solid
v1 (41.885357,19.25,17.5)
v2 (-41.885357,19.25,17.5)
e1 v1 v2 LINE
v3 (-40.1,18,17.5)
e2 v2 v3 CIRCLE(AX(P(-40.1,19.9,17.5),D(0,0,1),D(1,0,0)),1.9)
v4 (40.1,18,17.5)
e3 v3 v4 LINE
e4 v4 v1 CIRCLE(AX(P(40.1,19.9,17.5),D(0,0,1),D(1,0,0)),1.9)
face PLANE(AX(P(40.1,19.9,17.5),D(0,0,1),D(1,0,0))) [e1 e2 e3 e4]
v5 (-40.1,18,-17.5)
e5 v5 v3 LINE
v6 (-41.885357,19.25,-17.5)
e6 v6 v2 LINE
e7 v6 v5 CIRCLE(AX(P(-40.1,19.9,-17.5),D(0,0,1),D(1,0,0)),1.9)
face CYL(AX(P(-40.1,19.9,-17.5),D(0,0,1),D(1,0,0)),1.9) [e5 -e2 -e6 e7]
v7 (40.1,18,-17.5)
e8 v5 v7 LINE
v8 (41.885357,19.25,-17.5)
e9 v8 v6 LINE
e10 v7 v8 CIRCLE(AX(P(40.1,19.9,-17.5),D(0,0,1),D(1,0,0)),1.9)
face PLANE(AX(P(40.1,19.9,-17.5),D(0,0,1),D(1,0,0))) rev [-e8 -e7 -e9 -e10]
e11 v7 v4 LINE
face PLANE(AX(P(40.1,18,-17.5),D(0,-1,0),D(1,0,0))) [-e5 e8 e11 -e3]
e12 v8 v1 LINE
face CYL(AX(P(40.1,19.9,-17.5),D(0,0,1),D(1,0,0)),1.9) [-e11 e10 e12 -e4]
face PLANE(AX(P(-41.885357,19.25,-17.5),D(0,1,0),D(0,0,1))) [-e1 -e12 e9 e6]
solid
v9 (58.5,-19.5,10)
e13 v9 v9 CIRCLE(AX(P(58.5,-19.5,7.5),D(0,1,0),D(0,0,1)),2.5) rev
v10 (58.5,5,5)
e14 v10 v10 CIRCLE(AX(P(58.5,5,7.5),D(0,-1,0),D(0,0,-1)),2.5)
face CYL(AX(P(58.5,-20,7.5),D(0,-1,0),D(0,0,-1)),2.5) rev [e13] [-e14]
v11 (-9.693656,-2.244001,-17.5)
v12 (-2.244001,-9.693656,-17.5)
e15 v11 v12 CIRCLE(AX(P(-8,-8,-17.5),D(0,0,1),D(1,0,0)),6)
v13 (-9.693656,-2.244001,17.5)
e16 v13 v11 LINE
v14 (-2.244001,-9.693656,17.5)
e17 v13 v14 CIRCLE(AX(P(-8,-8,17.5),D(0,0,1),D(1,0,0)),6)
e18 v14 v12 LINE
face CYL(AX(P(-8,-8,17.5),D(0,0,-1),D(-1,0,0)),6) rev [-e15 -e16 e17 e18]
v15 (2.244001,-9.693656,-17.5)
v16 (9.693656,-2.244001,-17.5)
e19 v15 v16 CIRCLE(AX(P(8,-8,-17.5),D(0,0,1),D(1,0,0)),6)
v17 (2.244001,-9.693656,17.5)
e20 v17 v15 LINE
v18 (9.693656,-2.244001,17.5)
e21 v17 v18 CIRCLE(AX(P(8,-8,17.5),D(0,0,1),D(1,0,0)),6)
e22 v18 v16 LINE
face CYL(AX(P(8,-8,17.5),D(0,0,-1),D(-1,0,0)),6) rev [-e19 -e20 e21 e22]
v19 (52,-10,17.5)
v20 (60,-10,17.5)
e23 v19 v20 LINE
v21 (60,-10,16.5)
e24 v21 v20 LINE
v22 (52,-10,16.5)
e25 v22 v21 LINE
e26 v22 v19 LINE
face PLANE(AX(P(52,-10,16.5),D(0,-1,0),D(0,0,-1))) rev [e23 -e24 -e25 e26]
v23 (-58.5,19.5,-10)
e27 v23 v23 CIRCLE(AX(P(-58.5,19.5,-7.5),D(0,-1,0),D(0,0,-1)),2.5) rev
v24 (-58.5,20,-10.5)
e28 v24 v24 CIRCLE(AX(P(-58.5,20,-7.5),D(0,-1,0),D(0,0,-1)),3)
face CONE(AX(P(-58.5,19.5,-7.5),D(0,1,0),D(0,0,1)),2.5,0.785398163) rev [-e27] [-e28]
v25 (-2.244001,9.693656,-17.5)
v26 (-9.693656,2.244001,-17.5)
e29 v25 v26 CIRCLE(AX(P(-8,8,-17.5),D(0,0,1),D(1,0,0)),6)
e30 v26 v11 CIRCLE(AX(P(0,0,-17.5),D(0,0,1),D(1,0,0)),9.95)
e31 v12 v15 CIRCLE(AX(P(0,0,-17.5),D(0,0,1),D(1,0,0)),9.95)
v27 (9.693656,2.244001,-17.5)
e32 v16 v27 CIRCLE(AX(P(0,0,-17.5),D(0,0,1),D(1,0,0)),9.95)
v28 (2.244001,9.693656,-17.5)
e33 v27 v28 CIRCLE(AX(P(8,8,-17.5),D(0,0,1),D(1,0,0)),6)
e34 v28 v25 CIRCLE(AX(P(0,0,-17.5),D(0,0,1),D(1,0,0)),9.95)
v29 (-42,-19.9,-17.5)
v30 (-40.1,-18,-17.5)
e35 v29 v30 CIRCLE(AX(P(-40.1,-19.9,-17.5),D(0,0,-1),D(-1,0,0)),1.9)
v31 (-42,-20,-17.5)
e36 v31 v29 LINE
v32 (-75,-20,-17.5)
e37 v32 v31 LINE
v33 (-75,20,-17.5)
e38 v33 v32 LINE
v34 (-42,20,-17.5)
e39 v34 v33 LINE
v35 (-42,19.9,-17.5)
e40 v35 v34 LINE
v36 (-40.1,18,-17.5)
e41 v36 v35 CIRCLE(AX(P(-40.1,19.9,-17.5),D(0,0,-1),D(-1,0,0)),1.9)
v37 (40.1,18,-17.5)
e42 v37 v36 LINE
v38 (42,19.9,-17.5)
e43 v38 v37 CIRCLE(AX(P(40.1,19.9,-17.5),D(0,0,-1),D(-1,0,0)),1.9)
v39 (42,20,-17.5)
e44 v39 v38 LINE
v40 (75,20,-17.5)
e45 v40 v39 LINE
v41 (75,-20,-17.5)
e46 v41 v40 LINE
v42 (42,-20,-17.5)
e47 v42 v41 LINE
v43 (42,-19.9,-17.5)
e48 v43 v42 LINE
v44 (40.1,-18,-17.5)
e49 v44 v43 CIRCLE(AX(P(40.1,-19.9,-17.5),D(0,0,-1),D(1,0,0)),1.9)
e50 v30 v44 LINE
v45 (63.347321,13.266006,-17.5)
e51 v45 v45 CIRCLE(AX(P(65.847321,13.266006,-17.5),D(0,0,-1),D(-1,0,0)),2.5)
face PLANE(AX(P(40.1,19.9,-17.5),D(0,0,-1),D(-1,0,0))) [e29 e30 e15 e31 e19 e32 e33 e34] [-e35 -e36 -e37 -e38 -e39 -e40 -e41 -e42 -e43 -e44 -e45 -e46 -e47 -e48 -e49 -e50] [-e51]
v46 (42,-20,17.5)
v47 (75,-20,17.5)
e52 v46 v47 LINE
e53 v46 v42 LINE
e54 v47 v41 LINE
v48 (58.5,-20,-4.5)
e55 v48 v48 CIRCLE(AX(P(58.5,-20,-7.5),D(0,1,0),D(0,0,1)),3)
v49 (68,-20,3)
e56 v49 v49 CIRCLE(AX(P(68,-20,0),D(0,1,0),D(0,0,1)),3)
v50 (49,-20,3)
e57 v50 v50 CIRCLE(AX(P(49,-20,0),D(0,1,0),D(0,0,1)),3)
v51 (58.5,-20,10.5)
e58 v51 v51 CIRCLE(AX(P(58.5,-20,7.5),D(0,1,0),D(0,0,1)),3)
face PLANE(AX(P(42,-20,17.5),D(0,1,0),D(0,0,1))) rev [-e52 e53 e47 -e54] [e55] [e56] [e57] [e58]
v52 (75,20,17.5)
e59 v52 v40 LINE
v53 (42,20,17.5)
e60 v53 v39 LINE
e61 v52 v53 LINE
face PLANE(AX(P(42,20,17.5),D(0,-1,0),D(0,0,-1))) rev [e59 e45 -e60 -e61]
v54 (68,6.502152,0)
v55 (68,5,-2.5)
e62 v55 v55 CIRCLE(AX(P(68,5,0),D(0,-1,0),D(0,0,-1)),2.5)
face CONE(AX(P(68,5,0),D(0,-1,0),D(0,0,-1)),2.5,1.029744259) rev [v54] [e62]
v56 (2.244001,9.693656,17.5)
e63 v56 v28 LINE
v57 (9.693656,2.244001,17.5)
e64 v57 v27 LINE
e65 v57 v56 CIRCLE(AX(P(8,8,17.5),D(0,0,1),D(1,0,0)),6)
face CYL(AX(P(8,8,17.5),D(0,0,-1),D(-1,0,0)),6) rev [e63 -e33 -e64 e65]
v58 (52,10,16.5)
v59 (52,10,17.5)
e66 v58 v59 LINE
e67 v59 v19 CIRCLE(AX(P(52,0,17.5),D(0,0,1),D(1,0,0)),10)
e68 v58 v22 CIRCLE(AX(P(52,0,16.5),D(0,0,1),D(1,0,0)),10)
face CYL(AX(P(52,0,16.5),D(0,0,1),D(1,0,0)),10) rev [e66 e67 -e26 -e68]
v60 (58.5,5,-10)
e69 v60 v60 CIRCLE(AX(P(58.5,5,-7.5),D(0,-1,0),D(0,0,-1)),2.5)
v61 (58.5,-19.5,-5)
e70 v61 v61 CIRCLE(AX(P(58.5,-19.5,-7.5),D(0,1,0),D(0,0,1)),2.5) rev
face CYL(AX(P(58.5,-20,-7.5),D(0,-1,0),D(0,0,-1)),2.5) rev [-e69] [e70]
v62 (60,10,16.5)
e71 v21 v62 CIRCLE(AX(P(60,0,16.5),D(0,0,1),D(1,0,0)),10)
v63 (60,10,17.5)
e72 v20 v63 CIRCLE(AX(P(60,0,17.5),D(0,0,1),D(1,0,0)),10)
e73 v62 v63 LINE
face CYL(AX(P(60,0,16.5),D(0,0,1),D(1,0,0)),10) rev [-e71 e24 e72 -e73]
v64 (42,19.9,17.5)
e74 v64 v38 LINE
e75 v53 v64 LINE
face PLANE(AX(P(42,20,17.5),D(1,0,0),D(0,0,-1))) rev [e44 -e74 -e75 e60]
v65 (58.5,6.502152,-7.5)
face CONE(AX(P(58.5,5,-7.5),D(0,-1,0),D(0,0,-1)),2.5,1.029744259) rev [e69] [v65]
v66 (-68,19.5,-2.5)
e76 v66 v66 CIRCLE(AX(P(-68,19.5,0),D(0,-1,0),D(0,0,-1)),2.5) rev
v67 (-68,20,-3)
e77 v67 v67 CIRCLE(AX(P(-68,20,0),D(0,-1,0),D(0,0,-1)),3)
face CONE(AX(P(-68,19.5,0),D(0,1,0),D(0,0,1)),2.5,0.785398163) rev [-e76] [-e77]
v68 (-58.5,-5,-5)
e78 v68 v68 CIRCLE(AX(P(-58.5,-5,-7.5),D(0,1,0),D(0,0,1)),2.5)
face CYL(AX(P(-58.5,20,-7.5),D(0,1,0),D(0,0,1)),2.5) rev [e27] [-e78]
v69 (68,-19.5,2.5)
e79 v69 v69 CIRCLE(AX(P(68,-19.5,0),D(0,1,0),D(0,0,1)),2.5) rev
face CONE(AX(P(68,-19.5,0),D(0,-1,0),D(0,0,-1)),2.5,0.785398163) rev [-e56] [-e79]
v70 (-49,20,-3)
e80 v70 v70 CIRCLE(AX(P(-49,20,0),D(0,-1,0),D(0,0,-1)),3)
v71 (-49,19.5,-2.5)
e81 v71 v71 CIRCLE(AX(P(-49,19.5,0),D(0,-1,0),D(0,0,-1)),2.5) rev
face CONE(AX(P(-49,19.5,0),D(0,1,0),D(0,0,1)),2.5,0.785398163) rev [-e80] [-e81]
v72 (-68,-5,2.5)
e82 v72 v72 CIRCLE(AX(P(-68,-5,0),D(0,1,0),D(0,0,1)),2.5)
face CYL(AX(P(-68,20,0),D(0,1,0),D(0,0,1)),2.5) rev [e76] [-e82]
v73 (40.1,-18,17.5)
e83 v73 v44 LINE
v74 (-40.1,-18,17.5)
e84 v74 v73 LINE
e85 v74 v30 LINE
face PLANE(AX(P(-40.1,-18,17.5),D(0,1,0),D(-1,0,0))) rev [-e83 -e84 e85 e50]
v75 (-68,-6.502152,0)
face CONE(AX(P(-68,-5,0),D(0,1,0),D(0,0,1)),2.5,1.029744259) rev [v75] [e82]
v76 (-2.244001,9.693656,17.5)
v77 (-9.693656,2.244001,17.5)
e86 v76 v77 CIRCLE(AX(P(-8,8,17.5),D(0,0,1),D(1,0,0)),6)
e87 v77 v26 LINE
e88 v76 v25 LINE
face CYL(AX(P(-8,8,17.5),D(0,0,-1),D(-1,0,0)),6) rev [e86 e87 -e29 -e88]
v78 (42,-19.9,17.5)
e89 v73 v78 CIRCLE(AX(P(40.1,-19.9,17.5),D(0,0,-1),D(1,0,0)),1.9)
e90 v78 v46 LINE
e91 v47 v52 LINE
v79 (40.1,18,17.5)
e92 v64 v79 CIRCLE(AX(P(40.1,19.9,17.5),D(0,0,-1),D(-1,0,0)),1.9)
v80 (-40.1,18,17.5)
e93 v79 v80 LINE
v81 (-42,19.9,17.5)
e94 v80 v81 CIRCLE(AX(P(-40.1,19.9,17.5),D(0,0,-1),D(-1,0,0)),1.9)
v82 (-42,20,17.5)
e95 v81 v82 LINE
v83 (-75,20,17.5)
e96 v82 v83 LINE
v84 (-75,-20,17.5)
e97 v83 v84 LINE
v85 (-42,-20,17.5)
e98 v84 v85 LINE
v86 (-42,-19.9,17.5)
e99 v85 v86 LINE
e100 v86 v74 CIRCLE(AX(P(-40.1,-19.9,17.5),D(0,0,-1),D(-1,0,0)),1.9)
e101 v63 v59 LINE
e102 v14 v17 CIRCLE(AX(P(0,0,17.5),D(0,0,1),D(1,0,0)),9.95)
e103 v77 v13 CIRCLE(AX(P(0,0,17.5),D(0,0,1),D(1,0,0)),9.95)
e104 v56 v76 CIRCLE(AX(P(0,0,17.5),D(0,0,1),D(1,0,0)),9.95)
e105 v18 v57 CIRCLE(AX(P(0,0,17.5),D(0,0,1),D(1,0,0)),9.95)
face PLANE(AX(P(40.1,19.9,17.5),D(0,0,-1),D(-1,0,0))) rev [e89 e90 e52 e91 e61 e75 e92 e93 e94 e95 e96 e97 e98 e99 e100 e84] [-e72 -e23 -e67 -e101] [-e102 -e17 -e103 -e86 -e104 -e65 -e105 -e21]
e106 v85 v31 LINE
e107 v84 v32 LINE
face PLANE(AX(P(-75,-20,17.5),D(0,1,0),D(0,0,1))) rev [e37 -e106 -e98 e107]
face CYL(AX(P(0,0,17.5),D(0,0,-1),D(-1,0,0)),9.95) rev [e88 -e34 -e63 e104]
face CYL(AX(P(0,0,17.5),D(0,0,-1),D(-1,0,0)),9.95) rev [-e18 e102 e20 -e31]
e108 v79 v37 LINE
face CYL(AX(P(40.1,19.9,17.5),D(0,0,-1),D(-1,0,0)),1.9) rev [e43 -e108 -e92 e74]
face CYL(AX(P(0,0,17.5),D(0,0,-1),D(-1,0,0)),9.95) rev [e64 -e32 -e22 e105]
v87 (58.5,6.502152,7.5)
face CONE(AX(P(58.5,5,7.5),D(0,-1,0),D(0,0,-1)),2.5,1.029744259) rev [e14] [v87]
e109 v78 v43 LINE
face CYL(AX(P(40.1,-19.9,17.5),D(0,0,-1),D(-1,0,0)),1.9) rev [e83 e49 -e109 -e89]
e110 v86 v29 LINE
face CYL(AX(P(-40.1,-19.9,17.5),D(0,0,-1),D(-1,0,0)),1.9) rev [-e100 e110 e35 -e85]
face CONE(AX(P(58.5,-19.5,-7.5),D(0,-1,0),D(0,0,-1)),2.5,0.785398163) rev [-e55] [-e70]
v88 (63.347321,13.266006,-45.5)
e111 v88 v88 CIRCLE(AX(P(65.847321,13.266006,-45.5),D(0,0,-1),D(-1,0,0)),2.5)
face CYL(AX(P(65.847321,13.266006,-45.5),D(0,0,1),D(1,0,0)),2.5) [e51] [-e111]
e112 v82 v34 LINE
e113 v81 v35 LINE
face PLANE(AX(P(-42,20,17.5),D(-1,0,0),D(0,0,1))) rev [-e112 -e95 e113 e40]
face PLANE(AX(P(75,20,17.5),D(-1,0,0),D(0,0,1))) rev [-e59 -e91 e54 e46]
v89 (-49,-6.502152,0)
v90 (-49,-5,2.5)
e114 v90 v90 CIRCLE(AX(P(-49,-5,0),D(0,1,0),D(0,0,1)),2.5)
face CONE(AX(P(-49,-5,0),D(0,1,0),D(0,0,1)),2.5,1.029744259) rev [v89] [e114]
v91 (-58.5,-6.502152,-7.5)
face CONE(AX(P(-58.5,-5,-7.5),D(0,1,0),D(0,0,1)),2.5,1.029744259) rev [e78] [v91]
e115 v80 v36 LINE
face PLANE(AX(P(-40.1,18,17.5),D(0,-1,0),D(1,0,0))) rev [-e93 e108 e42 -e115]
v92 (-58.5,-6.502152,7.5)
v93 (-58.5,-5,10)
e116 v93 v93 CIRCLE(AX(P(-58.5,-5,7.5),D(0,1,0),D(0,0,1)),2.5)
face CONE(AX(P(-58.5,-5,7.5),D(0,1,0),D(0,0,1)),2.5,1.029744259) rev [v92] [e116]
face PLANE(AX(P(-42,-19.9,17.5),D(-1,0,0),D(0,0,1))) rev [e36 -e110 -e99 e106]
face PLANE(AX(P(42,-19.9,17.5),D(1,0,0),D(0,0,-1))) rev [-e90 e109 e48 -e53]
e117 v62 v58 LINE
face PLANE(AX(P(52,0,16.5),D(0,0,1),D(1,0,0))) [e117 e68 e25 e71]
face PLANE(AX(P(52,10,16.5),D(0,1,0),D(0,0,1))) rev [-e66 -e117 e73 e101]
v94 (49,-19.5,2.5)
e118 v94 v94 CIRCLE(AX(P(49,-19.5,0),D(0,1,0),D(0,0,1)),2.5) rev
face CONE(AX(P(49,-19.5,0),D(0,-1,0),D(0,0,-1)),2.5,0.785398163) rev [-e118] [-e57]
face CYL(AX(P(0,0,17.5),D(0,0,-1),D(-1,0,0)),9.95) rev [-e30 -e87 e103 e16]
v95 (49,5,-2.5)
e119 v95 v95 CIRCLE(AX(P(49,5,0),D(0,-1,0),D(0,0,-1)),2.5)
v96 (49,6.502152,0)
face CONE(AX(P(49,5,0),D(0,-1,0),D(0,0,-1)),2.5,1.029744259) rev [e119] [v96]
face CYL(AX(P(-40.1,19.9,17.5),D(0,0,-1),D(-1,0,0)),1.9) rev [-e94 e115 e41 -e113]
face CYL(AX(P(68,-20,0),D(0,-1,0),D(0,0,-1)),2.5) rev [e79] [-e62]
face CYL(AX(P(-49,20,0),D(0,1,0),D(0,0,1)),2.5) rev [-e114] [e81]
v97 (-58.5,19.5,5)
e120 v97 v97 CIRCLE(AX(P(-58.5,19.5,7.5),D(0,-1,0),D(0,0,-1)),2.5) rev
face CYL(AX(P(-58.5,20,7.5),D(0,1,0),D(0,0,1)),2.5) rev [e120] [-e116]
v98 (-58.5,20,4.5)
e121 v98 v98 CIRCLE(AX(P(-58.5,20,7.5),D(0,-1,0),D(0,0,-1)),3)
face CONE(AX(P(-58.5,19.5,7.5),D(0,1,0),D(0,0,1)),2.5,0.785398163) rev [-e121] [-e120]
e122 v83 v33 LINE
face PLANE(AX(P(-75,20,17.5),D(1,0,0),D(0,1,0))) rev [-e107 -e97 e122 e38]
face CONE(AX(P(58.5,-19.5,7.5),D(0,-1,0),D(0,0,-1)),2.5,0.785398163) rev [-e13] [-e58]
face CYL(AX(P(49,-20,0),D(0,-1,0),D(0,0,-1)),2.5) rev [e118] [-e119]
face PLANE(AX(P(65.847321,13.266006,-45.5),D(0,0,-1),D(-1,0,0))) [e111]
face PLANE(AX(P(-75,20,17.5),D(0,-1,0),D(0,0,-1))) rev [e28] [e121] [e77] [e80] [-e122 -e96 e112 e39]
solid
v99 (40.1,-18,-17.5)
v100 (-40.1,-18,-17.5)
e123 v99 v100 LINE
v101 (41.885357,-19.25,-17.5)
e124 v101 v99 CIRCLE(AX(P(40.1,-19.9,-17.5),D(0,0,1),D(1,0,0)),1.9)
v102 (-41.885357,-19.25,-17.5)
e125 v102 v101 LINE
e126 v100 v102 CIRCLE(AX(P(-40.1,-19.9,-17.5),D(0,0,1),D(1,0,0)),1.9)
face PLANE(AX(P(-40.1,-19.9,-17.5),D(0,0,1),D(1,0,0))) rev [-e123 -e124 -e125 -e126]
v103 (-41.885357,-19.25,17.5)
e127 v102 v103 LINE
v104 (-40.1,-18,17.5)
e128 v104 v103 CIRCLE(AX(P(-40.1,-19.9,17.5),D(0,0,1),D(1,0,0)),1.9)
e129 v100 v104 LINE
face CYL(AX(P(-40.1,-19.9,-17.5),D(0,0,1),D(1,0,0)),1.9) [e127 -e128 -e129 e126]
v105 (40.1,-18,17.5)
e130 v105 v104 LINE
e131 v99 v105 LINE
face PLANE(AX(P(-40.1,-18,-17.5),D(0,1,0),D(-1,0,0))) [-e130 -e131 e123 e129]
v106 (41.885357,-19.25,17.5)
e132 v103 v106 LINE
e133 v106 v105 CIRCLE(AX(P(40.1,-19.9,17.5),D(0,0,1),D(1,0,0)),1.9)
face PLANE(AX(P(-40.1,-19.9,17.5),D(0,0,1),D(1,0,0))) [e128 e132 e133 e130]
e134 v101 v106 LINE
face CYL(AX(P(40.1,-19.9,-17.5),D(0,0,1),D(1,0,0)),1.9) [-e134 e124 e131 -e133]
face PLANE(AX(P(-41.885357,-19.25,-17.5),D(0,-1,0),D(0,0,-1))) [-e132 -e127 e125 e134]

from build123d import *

# Parameters (mm, degrees)
EXTRUDE_1_DEPTH     = 17.5
EXTRUDE_2_DEPTH     = 35
EXTRUDE_2_2_DEPTH   = 35
CUT_EXTRUDE_1_DEPTH = 1
CHAMFER_2_SIZE      = 0.5
SKETCH1_R           = 2.5
BOSS_EXTRUDE1_DEPTH = 28


# Read off the part's stored shape, not the designer's step: M6 螺纹孔2
with BuildPart() as part:
    # 草图1 → 凸台-拉伸1 (new, symmetric)
    with BuildSketch(Plane.XY):
        with BuildLine():
            Line((-42, 20), (-42, 19.9))
            ThreePointArc((-42, 19.9), (-41.443502884, 18.556497116), (-40.1, 18))
            Line((-40.1, 18), (40.1, 18))
            ThreePointArc((40.1, 18), (41.443502884, 18.556497116), (42, 19.9))
            Line((42, 19.9), (42, 20))
            Line((42, 20), (75, 20))
            Line((75, 20), (75, -20))
            Line((75, -20), (42, -20))
            Line((42, -20), (42, -19.9))
            ThreePointArc((42, -19.9), (41.443502884, -18.556497116), (40.1, -18))
            Line((40.1, -18), (-40.1, -18))
            ThreePointArc((-40.1, -18), (-41.443502884, -18.556497116), (-42, -19.9))
            Line((-42, -19.9), (-42, -20))
            Line((-42, -20), (-75, -20))
            Line((-75, -20), (-75, 20))
            Line((-75, 20), (-42, 20))
        make_face()
        with BuildLine():
            ThreePointArc((2.244000503, 9.693655747), (0, 9.95), (-2.244000503, 9.693655747))
            ThreePointArc((-2.244000503, 9.693655747), (-12.242640687, 12.242640687), (-9.693655747, 2.244000503))
            ThreePointArc((-9.693655747, 2.244000503), (-9.95, 0), (-9.693655747, -2.244000503))
            ThreePointArc((-9.693655747, -2.244000503), (-12.242640687, -12.242640687), (-2.244000503, -9.693655747))
            ThreePointArc((-2.244000503, -9.693655747), (0, -9.95), (2.244000503, -9.693655747))
            ThreePointArc((2.244000503, -9.693655747), (12.242640687, -12.242640687), (9.693655747, -2.244000503))
            ThreePointArc((9.693655747, -2.244000503), (9.95, 0), (9.693655747, 2.244000503))
            ThreePointArc((9.693655747, 2.244000503), (12.242640687, 12.242640687), (2.244000503, 9.693655747))
        make_face(mode=Mode.SUBTRACT)
    extrude(amount=EXTRUDE_1_DEPTH, both=True)

    # 草图3 → 切除-拉伸1 (cut)
    with BuildSketch(Plane.XY.offset(17.5)):
        with BuildLine():
            Line((52, 10), (60, 10))
            ThreePointArc((60, 10), (70, 0), (60, -10))
            Line((60, -10), (52, -10))
            ThreePointArc((52, -10), (42, 0), (52, 10))
        make_face()
    extrude(amount=-CUT_EXTRUDE_1_DEPTH, mode=Mode.SUBTRACT)

    # M6 螺纹孔2 outline → M6 螺纹孔2 (revolve, cut)
    with BuildSketch(Plane(origin=(-58.5, 0, 7.5), x_dir=(1, 0, 0), z_dir=(0, 0, 1))):
        Polygon((0, 20), (0, -6.502151548), (2.5, -5), (2.5, 20), align=None)
    revolve(axis=Axis((-58.5, 0, 7.5), (0, 1, 0)), mode=Mode.SUBTRACT)

    # Hole Wizard M6 _2 2 outline → Hole Wizard M6 _2 2 (revolve, cut)
    with BuildSketch(Plane(origin=(-68, 0, 0), x_dir=(1, 0, 0), z_dir=(0, 0, 1))):
        Polygon((0, 20), (0, -6.502151548), (2.5, -5), (2.5, 20), align=None)
    revolve(axis=Axis((-68, 0, 0), (0, 1, 0)), mode=Mode.SUBTRACT)

    # Hole Wizard M6 _2 3 outline → Hole Wizard M6 _2 3 (revolve, cut)
    with BuildSketch(Plane(origin=(-58.5, 0, -7.5), x_dir=(1, 0, 0), z_dir=(0, 0, 1))):
        Polygon((0, 20), (0, -6.502151548), (2.5, -5), (2.5, 20), align=None)
    revolve(axis=Axis((-58.5, 0, -7.5), (0, 1, 0)), mode=Mode.SUBTRACT)

    # Hole Wizard M6 _2 4 outline → Hole Wizard M6 _2 4 (revolve, cut)
    with BuildSketch(Plane(origin=(-49, 0, 0), x_dir=(1, 0, 0), z_dir=(0, 0, 1))):
        Polygon((0, 20), (0, -6.502151548), (2.5, -5), (2.5, 20), align=None)
    revolve(axis=Axis((-49, 0, 0), (0, 1, 0)), mode=Mode.SUBTRACT)

    # Hole Wizard M6 _2 5 outline → Hole Wizard M6 _2 5 (revolve, cut)
    with BuildSketch(Plane(origin=(68, 0, 0), x_dir=(1, 0, 0), z_dir=(0, 0, 1))):
        Polygon((2.5, 5), (0, 6.502151548), (0, -20), (2.5, -20), align=None)
    revolve(axis=Axis((68, 0, 0), (0, 1, 0)), mode=Mode.SUBTRACT)

    # Hole Wizard M6 _2 6 outline → Hole Wizard M6 _2 6 (revolve, cut)
    with BuildSketch(Plane(origin=(58.5, 0, 7.5), x_dir=(1, 0, 0), z_dir=(0, 0, 1))):
        Polygon((2.5, 5), (0, 6.502151548), (0, -20), (2.5, -20), align=None)
    revolve(axis=Axis((58.5, 0, 7.5), (0, 1, 0)), mode=Mode.SUBTRACT)

    # Hole Wizard M6 _2 7 outline → Hole Wizard M6 _2 7 (revolve, cut)
    with BuildSketch(Plane(origin=(58.5, 0, -7.5), x_dir=(1, 0, 0), z_dir=(0, 0, 1))):
        Polygon((2.5, 5), (0, 6.502151548), (0, -20), (2.5, -20), align=None)
    revolve(axis=Axis((58.5, 0, -7.5), (0, 1, 0)), mode=Mode.SUBTRACT)

    # Hole Wizard M6 _2 8 outline → Hole Wizard M6 _2 8 (revolve, cut)
    with BuildSketch(Plane(origin=(49, 0, 0), x_dir=(1, 0, 0), z_dir=(0, 0, 1))):
        Polygon((2.5, 5), (0, 6.502151548), (0, -20), (2.5, -20), align=None)
    revolve(axis=Axis((49, 0, 0), (0, 1, 0)), mode=Mode.SUBTRACT)

    # 倒角2
    chamfer_2_edges = [part.edges().sort_by_distance(p)[0] for p in [
        (65.5, -20, 0),
        (56, -20, 7.5),
        (56, -20, -7.5),
        (46.5, -20, 0),
        (-61, 20, 7.5),
        (-70.5, 20, 0),
        (-61, 20, -7.5),
        (-51.5, 20, 0),
    ]]
    chamfer(chamfer_2_edges, length=CHAMFER_2_SIZE)

    # Sketch1 → Boss-Extrude1 (add)
    with BuildSketch(Plane(origin=(0, 0, -17.5), x_dir=(-1, 0, 0), z_dir=(0, 0, -1))):
        with Locations((-65.847321135, 13.266006363)):
            Circle(SKETCH1_R)
    extrude(amount=BOSS_EXTRUDE1_DEPTH)


with BuildPart() as body_2:
    # 草图2 → 凸台-拉伸2 (new body)
    with BuildSketch(Plane.XY.offset(17.5)):
        with BuildLine():
            Line((-41.885357107, 19.25), (41.885357107, 19.25))
            ThreePointArc((41.885357107, 19.25), (41.189724736, 18.343561758), (40.1, 18))
            Line((40.1, 18), (-40.1, 18))
            ThreePointArc((-40.1, 18), (-41.189724736, 18.343561758), (-41.885357107, 19.25))
        make_face()
    extrude(amount=-EXTRUDE_2_DEPTH)


with BuildPart() as body_3:
    # 草图2 → Extrude 2 2 (new body)
    with BuildSketch(Plane.XY.offset(17.5)):
        with BuildLine():
            Line((-41.885357107, -19.25), (41.885357107, -19.25))
            ThreePointArc((41.885357107, -19.25), (41.189724736, -18.343561758), (40.1, -18))
            Line((40.1, -18), (-40.1, -18))
            ThreePointArc((-40.1, -18), (-41.189724736, -18.343561758), (-41.885357107, -19.25))
        make_face()
    extrude(amount=-EXTRUDE_2_2_DEPTH)


solid = Compound([part.part, body_2.part, body_3.part])
